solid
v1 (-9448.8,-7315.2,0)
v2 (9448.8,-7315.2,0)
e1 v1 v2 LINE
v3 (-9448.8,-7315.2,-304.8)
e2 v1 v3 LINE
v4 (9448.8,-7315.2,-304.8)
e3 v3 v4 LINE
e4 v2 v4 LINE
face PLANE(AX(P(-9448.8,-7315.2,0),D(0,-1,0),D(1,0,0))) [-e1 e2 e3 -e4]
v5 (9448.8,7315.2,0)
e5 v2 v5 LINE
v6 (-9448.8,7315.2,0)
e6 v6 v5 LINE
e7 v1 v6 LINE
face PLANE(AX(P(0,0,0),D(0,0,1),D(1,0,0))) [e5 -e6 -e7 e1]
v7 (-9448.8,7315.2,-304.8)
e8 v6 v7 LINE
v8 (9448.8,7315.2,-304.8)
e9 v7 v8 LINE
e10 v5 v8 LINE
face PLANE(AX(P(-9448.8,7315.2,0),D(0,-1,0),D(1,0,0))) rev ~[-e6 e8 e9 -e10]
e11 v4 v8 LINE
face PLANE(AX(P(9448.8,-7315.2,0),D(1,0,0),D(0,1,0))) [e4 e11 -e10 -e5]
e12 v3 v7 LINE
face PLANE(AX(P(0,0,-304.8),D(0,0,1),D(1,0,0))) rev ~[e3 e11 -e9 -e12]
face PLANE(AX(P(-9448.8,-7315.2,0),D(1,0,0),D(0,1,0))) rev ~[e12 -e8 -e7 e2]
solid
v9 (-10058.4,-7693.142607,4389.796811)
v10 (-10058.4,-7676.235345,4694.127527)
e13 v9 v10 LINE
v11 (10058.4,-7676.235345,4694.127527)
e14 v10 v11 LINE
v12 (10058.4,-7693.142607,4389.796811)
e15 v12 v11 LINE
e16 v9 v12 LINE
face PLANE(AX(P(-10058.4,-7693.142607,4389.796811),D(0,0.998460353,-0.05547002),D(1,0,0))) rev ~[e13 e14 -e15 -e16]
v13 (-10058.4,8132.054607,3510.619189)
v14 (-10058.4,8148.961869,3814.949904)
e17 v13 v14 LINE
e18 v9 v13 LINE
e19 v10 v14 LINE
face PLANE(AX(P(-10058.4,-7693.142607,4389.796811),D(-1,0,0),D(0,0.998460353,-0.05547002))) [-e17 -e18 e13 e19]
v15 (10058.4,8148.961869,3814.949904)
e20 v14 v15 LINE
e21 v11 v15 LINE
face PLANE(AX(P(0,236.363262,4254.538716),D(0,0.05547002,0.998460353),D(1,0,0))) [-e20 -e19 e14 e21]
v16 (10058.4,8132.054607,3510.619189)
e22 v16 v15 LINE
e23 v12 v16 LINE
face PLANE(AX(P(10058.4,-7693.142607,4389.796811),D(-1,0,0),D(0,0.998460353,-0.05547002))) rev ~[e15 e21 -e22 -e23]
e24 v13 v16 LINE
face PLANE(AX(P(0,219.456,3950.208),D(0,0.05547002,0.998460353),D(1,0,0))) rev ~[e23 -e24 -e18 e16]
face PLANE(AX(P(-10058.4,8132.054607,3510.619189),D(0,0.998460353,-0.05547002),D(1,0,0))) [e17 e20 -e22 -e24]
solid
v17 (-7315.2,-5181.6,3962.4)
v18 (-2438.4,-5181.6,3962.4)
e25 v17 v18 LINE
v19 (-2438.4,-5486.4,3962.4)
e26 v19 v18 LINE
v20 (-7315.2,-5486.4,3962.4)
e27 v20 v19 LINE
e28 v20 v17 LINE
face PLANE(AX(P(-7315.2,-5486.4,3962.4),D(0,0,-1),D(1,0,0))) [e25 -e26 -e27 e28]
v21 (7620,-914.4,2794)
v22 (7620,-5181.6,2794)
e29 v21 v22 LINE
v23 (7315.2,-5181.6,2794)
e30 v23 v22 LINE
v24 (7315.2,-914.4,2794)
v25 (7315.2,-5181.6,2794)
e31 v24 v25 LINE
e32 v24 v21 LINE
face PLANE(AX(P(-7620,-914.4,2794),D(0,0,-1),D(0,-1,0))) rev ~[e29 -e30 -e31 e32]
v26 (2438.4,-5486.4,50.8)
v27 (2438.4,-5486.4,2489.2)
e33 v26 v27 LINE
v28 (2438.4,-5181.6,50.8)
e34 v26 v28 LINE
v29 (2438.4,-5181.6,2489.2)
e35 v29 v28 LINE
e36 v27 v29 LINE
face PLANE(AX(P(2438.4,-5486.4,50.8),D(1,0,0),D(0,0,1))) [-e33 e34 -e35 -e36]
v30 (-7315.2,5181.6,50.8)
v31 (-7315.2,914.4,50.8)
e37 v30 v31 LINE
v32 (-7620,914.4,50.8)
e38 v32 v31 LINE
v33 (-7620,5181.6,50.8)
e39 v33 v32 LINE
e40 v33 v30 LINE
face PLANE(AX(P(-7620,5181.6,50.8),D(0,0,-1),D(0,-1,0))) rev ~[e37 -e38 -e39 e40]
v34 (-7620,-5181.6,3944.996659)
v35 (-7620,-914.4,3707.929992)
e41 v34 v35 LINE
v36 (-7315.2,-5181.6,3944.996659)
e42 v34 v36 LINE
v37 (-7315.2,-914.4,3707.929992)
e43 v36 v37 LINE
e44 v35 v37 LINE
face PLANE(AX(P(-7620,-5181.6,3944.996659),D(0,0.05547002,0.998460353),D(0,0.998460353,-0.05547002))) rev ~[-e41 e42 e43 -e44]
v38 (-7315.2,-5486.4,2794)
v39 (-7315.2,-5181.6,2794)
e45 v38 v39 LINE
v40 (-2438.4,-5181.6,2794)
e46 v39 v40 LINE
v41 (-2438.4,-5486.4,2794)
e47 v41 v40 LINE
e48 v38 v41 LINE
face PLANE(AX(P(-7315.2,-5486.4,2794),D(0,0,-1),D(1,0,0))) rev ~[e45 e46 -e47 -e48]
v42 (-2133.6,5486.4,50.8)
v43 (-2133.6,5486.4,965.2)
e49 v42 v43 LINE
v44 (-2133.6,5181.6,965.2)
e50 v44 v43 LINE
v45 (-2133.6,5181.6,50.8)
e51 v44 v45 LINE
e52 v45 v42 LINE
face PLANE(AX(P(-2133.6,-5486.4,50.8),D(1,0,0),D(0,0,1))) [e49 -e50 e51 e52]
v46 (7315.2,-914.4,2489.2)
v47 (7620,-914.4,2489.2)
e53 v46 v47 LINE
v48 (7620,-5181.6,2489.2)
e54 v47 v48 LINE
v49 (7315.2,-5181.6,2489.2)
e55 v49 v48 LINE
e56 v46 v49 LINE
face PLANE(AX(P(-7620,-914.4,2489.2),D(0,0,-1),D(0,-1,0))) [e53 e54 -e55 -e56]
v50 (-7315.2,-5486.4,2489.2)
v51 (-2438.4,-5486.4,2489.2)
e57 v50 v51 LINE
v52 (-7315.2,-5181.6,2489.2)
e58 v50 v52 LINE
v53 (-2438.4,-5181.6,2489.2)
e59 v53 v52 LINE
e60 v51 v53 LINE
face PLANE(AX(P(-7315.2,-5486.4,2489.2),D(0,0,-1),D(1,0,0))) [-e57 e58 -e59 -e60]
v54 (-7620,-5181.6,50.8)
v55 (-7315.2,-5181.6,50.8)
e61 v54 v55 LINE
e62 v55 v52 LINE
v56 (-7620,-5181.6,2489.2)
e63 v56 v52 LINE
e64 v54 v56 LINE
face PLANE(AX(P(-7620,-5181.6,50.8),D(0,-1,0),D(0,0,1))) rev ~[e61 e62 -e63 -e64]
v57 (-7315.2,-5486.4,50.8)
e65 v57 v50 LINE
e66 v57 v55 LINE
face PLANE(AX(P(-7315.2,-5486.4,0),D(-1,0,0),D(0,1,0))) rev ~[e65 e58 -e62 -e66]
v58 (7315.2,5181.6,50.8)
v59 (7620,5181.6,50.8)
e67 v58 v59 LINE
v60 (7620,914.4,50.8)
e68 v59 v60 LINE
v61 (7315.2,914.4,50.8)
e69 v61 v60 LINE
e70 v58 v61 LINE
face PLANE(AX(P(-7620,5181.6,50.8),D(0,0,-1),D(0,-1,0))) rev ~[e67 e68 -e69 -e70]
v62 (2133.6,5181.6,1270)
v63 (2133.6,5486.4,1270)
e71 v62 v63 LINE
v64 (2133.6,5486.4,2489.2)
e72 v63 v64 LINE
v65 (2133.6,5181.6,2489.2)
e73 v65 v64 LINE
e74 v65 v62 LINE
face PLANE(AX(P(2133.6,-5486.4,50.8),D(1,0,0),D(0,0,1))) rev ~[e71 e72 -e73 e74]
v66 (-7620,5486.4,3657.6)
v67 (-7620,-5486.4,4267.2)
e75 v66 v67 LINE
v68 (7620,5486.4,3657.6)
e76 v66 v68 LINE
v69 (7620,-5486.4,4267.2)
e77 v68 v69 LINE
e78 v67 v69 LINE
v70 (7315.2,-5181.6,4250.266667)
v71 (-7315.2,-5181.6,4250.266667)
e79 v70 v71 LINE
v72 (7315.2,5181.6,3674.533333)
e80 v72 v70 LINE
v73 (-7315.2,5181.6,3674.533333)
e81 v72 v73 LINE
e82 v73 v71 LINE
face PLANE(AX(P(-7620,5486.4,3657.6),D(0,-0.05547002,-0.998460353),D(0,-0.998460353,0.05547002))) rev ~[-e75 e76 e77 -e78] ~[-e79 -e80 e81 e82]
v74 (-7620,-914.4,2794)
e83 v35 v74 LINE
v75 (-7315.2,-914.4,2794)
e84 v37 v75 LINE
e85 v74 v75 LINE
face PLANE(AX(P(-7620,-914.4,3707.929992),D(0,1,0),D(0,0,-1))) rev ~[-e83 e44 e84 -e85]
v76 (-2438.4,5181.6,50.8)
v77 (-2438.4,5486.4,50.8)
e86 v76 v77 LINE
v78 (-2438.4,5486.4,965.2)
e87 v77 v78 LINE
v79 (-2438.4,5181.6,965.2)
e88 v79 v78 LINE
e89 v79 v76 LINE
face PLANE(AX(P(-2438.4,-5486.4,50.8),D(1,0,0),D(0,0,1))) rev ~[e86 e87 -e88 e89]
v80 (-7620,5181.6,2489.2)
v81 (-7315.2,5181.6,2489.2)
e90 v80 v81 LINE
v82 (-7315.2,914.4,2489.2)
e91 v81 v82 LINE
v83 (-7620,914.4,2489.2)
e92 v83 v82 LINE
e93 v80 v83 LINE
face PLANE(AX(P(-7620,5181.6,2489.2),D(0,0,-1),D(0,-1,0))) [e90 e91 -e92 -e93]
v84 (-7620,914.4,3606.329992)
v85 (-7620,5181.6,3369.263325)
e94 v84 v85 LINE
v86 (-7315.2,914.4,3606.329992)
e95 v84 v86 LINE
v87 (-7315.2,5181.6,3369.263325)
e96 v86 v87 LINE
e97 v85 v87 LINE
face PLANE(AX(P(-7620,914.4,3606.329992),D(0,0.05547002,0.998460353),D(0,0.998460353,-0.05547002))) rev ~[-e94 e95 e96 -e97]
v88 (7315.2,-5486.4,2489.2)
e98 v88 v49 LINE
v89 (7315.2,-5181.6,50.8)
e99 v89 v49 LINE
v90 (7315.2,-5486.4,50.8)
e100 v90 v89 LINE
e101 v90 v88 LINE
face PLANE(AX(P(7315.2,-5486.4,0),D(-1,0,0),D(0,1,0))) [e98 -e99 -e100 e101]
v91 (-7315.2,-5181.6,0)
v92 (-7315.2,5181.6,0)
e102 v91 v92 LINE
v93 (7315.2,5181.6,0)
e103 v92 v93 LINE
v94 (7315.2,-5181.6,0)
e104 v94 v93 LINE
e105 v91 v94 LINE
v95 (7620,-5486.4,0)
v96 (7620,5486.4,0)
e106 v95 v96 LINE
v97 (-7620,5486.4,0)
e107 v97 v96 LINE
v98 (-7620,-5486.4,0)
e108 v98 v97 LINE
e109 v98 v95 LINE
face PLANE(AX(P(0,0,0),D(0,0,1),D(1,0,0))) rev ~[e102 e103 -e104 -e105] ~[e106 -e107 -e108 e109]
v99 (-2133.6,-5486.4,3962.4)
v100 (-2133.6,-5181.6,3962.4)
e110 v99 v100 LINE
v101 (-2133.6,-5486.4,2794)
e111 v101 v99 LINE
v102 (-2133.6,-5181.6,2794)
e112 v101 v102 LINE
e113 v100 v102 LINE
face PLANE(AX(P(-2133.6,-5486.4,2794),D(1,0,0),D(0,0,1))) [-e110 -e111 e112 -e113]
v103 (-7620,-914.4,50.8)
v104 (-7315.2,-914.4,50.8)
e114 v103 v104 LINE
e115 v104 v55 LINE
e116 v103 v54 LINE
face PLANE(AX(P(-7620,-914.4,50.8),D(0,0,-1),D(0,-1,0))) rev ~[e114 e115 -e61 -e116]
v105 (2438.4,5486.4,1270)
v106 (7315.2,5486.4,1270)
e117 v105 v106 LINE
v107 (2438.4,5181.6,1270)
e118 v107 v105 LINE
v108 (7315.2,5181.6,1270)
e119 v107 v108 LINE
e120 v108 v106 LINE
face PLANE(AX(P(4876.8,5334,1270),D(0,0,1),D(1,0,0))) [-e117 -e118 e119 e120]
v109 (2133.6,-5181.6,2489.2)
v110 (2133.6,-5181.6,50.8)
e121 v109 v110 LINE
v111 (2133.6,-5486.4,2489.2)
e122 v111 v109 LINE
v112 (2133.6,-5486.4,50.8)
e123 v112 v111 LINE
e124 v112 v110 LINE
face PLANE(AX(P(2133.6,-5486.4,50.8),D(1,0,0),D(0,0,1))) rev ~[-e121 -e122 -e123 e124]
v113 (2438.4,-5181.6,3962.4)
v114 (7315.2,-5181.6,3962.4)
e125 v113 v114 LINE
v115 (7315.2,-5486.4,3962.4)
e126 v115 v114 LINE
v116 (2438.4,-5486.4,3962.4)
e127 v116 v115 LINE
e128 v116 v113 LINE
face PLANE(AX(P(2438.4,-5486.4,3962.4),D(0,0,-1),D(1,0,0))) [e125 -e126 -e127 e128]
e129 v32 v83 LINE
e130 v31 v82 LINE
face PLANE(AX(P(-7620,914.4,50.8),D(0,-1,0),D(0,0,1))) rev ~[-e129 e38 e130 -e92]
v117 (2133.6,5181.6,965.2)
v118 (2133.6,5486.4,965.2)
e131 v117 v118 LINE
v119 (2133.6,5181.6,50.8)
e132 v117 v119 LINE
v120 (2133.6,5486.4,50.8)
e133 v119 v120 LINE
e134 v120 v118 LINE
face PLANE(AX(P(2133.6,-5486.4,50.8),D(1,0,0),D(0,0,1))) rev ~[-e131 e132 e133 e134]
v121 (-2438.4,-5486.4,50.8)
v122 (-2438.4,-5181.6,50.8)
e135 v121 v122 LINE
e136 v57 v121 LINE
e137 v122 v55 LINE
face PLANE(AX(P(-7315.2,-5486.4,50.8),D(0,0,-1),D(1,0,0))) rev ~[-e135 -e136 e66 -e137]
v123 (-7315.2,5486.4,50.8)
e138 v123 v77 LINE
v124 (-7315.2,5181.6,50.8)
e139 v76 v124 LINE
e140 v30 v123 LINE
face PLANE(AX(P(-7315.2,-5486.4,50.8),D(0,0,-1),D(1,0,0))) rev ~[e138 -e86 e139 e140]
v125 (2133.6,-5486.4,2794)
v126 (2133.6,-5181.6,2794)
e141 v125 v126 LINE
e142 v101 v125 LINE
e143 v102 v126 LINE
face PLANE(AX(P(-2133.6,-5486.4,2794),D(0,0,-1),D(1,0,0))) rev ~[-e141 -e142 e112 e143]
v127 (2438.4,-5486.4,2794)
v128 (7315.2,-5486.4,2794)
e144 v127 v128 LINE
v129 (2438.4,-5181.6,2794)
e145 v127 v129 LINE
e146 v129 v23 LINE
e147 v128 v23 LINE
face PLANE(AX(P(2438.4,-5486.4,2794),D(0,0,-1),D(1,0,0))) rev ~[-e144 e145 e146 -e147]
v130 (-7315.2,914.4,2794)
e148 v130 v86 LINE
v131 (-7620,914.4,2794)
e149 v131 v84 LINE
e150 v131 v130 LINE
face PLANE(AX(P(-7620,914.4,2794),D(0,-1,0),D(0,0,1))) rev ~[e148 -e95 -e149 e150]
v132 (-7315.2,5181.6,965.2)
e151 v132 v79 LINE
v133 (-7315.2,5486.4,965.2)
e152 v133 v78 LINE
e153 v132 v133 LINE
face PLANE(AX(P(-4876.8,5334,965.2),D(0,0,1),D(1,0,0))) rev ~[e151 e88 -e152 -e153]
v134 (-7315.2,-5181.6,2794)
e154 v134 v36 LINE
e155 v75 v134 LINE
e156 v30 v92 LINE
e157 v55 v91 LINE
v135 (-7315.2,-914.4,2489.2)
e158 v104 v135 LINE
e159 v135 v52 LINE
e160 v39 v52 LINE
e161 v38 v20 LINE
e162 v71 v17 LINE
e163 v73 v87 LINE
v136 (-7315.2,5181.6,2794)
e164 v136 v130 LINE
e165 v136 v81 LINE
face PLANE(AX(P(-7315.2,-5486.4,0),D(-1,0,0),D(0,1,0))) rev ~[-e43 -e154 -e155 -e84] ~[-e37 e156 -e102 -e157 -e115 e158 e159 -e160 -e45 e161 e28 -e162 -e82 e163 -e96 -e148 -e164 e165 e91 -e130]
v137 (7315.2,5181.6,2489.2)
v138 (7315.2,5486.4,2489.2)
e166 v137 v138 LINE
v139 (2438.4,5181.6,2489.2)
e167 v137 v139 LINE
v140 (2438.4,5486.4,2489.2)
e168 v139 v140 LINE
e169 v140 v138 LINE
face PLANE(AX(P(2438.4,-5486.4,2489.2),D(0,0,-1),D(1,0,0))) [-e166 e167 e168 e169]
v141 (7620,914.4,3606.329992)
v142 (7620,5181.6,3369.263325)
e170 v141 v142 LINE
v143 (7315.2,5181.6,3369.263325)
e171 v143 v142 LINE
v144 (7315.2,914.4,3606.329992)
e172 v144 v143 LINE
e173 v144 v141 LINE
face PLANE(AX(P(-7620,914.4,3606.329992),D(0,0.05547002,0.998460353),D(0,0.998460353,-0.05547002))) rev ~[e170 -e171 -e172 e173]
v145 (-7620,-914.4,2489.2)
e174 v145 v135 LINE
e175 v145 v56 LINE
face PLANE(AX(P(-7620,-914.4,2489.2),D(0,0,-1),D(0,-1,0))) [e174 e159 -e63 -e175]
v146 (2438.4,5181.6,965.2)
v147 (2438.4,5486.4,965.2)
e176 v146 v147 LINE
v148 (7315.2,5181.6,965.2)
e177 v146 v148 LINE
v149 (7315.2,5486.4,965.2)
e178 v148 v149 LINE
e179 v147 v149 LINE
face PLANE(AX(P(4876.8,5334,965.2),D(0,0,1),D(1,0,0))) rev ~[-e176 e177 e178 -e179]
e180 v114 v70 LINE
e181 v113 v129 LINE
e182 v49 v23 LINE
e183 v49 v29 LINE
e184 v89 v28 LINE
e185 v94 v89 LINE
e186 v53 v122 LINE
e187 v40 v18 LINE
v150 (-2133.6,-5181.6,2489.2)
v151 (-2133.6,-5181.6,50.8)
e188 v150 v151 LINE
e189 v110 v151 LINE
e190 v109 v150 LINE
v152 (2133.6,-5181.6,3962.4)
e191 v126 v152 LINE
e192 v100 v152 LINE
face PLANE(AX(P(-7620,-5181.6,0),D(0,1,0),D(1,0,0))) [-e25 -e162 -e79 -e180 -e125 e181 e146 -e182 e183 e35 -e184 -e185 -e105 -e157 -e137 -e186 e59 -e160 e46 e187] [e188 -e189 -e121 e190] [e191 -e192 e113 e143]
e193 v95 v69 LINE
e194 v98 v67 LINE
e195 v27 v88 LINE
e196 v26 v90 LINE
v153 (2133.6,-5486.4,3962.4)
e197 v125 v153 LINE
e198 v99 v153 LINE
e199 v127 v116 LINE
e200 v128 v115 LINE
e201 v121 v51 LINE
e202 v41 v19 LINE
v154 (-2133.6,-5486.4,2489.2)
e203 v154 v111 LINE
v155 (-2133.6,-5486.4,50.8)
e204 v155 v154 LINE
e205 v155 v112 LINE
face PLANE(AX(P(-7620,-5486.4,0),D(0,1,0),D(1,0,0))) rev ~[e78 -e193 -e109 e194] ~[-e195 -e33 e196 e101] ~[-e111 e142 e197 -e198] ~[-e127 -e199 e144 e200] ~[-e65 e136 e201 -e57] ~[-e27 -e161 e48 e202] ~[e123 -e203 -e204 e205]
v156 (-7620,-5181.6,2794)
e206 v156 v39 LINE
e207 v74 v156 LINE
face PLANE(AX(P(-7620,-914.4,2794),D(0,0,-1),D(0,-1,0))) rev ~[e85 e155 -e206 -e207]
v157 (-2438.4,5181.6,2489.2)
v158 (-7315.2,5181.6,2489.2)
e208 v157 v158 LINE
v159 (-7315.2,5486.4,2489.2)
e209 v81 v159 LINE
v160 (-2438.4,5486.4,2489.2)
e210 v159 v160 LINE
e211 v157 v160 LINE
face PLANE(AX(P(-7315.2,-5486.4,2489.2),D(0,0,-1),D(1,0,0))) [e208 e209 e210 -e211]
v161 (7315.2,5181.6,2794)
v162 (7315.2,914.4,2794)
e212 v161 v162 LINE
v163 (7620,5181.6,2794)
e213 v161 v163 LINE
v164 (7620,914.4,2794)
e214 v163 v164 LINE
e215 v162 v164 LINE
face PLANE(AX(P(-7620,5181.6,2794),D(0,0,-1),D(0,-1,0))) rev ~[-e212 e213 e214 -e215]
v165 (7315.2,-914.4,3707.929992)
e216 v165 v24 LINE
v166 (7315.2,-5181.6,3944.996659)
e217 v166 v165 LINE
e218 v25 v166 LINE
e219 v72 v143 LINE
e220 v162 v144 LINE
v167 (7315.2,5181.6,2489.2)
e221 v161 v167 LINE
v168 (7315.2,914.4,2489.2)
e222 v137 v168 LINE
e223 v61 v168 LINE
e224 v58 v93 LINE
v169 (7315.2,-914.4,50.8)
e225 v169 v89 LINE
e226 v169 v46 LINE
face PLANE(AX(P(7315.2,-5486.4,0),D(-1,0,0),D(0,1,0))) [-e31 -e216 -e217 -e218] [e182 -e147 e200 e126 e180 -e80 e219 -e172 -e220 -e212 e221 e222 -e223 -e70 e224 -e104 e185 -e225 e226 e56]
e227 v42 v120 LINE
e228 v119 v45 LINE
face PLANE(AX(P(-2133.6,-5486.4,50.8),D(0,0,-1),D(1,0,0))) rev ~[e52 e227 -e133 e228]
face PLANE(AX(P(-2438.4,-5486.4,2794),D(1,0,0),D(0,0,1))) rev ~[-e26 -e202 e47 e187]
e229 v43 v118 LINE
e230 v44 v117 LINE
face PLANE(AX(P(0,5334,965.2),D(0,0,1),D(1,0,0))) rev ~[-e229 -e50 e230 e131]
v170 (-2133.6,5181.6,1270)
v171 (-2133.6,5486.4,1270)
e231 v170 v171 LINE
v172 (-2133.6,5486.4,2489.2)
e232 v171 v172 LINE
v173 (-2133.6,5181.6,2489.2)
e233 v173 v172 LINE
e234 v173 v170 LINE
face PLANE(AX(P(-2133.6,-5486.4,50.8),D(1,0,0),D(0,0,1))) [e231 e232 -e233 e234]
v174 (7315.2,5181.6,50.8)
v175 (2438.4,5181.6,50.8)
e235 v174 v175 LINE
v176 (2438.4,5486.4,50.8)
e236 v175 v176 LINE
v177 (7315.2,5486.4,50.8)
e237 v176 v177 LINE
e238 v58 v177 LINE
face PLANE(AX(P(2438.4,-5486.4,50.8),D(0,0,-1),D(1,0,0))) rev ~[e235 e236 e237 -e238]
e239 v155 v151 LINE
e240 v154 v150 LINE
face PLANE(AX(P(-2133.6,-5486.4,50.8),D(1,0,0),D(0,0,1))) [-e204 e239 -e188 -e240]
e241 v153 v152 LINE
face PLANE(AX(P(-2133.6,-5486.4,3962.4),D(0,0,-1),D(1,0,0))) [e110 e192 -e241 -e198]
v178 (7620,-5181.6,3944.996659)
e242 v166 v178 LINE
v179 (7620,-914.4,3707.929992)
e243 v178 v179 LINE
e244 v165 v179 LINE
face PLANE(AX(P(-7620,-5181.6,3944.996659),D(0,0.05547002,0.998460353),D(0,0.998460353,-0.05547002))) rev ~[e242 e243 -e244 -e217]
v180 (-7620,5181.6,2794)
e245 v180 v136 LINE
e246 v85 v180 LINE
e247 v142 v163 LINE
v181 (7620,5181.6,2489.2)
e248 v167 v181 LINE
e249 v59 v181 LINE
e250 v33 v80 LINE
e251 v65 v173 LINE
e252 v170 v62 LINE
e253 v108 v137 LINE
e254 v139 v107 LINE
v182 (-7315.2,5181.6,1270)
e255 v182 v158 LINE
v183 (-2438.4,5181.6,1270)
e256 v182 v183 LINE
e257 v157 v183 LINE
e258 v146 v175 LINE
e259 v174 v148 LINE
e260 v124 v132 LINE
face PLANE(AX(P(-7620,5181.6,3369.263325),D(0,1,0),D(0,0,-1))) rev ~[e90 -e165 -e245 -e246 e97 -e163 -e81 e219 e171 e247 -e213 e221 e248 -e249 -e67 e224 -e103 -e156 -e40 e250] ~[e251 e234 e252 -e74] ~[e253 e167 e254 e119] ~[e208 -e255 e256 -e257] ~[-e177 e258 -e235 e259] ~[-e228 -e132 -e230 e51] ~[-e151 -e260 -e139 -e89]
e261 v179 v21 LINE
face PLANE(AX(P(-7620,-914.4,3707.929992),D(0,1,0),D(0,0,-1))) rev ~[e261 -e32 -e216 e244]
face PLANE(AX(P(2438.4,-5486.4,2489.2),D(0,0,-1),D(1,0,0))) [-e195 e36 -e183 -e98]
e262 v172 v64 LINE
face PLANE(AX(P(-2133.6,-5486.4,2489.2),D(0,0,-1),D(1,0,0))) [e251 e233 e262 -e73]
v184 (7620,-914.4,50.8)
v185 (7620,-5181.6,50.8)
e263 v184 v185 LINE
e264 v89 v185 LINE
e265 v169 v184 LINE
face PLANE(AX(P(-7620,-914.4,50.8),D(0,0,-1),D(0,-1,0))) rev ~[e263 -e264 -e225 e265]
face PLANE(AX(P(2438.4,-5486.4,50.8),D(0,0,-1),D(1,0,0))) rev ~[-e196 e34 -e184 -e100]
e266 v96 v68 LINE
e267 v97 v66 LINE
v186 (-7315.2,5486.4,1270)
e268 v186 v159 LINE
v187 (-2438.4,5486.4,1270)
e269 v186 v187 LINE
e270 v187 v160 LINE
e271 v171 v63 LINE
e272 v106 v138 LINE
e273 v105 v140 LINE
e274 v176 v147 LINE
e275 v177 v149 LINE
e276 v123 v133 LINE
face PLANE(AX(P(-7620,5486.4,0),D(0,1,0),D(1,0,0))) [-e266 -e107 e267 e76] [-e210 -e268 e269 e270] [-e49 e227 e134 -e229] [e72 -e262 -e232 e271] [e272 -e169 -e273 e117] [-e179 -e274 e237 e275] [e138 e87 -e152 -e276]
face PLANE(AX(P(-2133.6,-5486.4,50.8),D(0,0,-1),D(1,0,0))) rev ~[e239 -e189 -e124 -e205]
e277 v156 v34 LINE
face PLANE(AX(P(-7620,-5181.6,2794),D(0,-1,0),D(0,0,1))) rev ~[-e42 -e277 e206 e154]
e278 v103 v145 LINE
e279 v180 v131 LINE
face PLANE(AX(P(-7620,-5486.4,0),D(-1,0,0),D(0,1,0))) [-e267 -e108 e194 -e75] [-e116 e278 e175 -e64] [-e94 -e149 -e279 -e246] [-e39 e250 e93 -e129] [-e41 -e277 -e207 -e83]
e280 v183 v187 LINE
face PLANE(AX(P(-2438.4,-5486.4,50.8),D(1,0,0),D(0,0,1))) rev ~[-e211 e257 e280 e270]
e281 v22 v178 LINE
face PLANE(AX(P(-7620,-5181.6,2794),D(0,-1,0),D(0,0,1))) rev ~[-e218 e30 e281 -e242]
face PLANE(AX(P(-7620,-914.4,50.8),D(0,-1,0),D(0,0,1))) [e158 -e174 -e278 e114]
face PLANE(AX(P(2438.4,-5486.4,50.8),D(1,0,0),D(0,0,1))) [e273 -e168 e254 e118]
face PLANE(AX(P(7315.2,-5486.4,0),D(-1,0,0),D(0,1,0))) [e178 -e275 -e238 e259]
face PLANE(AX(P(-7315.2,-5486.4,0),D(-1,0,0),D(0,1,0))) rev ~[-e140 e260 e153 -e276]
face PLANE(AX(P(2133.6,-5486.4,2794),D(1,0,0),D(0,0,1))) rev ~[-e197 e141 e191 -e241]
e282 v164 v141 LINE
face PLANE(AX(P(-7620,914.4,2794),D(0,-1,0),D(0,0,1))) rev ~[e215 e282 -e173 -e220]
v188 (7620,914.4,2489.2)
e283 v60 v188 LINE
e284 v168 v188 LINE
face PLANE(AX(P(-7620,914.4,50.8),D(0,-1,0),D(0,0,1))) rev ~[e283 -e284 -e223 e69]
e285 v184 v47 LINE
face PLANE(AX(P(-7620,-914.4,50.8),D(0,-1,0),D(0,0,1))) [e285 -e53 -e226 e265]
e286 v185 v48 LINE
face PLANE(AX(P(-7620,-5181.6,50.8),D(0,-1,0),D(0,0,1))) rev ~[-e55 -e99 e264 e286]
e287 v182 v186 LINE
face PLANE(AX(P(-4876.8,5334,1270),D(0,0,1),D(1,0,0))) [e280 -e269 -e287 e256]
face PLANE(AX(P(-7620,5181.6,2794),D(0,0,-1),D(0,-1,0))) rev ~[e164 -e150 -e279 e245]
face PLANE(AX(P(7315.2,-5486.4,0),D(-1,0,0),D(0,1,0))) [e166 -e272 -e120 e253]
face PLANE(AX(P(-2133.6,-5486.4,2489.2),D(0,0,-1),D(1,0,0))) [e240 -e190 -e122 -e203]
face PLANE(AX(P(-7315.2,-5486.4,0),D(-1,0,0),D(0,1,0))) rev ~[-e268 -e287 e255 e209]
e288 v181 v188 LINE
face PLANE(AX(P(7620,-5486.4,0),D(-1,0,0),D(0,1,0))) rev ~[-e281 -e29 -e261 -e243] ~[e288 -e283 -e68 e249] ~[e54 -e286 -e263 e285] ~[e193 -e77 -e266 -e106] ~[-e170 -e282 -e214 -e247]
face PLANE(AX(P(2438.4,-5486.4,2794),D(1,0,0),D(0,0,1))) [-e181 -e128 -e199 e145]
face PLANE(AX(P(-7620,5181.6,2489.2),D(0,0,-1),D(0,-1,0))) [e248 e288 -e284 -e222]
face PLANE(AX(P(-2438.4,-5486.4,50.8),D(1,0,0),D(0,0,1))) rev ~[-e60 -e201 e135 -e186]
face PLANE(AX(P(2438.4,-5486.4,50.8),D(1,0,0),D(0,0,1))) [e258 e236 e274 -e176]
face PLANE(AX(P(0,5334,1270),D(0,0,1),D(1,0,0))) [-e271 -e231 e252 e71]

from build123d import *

# Parameters (mm, degrees)
F0_W      = 18897.6
F0_H      = 14630.4
F1_DEPTH  = 304.8
F2_W      = 15240
F2_H      = 10972.8
F3_DEPTH  = 4267.2
F5_DEPTH  = 15240
F6_T      = -304.8
F7_W      = 20116.8
F7_H      = 15849.6
F7_W_2    = 15240
F7_H_2    = 10989.7202876142
F7_W_3    = 14630.4
F7_H_3    = 10379.1802716357
F8_DEPTH  = 304.8
F9_W      = 4267.2
F9_H      = 2438.4
F9_W_2    = 4876.8
F10_DEPTH = 10972.8
F11_W     = 4267.2
F11_H     = 2438.4
F12_DEPTH = 15240
F13_W     = 4876.8
F13_H     = 1168.4
F13_W_2   = 4267.2
F14_DEPTH = 304.8
F16_DEPTH = 15240
F18_W     = 4876.8
F18_H     = 304.8000000003
F18_W_2   = 4267.2
F19_DEPTH = 304.8


with BuildPart() as f1:
    # F0 (on Top) → F1 (new body)
    with BuildSketch(Plane.XY):
        Rectangle(F0_W, F0_H)
    extrude(amount=-F1_DEPTH)


with BuildPart() as f3:
    # F2 (on face) → F3 (new body)
    with BuildSketch(Plane.XY):
        Rectangle(F2_W, F2_H)
    extrude(amount=F3_DEPTH)

    # F4 (on face) → F5 (cut, through all)
    with BuildSketch(Plane(origin=(-7620, 0, 0), x_dir=(0, -1, 0), z_dir=(-1, 0, 0))):
        Polygon((-5486.4, 4267.2), (-5486.4, 3657.6), (5486.4, 4267.2), align=None)
    extrude(amount=-F5_DEPTH, mode=Mode.SUBTRACT)

    # F6
    f6_openings = [f3.faces().sort_by_distance(p)[0] for p in [
        (0, 0, 3962.4),
        (0, 0, 0),
    ]]
    offset(amount=F6_T, openings=f6_openings)

    # F9 (on face) → F10 (cut, through all)
    with BuildSketch(Plane.XZ.offset(5486.4)):
        with Locations((0, 1270)):
            Rectangle(F9_W, F9_H)
        with Locations((4876.8, 1270)):
            Rectangle(F9_W_2, F9_H)
        with Locations((-4876.8, 1270)):
            Rectangle(F9_W_2, F9_H)
    extrude(amount=-F10_DEPTH, mode=Mode.SUBTRACT)

    # F11 (on face) → F12 (cut, through all)
    with BuildSketch(Plane(origin=(-7620, 0, 0), x_dir=(0, -1, 0), z_dir=(-1, 0, 0))):
        with Locations((-3048, 1270)):
            Rectangle(F11_W, F11_H)
        with Locations((3048, 1270)):
            Rectangle(F11_W, F11_H)
    extrude(amount=-F12_DEPTH, mode=Mode.SUBTRACT)

    # F13 (on face) → F14 (cut, through all)
    with BuildSketch(Plane.XZ.offset(5486.4)):
        with Locations((4876.8, 3378.2)):
            Rectangle(F13_W, F13_H)
        with Locations((0, 3378.2)):
            Rectangle(F13_W_2, F13_H)
        with Locations((-4876.8, 3378.2)):
            Rectangle(F13_W, F13_H)
    extrude(amount=-F14_DEPTH, mode=Mode.SUBTRACT)

    # F15 (on face) → F16 (cut, through all)
    with BuildSketch(Plane(origin=(-7620, 0, 0), x_dir=(0, -1, 0), z_dir=(-1, 0, 0))):
        Polygon((-5181.6, 2794), (-914.4, 2794), (-914.4, 3606.3299920107), (-5181.6, 3369.263325344), align=None)
        Polygon((914.4, 2794), (5181.6, 2794), (5181.6, 3944.9966586774), (914.4, 3707.9299920107), align=None)
    extrude(amount=-F16_DEPTH, mode=Mode.SUBTRACT)

    # F18 (on offset) → F19 (join)
    with BuildSketch(Plane.XY.offset(965.2)):
        with Locations((4876.8, 5334.0000000002)):
            Rectangle(F18_W, F18_H)
        with Locations((0, 5334.0000000002)):
            Rectangle(F18_W_2, F18_H)
        with Locations((-4876.8, 5334.0000000002)):
            Rectangle(F18_W, F18_H)
    extrude(amount=F19_DEPTH)


with BuildPart() as f8:
    # F7 (on face) → F8 (new body)
    with BuildSketch(Plane(origin=(0, 219.456, 3950.208), x_dir=(1, 0, 0), z_dir=(0, 0.0554700196, 0.9984603532))):
        Rectangle(F7_W, F7_H)
        with Locations((0, -219.7944057523)):
            Rectangle(F7_W_2, F7_H_2, mode=Mode.SUBTRACT)
        with Locations((0, -219.7944057523)):
            Rectangle(F7_W_2, F7_H_2)
        with Locations((0, -219.7944057523)):
            Rectangle(F7_W_3, F7_H_3, mode=Mode.SUBTRACT)
        with Locations((0, -219.7944057523)):
            Rectangle(F7_W_3, F7_H_3)
    extrude(amount=F8_DEPTH)


solid = Compound([f1.part, f3.part, f8.part])
